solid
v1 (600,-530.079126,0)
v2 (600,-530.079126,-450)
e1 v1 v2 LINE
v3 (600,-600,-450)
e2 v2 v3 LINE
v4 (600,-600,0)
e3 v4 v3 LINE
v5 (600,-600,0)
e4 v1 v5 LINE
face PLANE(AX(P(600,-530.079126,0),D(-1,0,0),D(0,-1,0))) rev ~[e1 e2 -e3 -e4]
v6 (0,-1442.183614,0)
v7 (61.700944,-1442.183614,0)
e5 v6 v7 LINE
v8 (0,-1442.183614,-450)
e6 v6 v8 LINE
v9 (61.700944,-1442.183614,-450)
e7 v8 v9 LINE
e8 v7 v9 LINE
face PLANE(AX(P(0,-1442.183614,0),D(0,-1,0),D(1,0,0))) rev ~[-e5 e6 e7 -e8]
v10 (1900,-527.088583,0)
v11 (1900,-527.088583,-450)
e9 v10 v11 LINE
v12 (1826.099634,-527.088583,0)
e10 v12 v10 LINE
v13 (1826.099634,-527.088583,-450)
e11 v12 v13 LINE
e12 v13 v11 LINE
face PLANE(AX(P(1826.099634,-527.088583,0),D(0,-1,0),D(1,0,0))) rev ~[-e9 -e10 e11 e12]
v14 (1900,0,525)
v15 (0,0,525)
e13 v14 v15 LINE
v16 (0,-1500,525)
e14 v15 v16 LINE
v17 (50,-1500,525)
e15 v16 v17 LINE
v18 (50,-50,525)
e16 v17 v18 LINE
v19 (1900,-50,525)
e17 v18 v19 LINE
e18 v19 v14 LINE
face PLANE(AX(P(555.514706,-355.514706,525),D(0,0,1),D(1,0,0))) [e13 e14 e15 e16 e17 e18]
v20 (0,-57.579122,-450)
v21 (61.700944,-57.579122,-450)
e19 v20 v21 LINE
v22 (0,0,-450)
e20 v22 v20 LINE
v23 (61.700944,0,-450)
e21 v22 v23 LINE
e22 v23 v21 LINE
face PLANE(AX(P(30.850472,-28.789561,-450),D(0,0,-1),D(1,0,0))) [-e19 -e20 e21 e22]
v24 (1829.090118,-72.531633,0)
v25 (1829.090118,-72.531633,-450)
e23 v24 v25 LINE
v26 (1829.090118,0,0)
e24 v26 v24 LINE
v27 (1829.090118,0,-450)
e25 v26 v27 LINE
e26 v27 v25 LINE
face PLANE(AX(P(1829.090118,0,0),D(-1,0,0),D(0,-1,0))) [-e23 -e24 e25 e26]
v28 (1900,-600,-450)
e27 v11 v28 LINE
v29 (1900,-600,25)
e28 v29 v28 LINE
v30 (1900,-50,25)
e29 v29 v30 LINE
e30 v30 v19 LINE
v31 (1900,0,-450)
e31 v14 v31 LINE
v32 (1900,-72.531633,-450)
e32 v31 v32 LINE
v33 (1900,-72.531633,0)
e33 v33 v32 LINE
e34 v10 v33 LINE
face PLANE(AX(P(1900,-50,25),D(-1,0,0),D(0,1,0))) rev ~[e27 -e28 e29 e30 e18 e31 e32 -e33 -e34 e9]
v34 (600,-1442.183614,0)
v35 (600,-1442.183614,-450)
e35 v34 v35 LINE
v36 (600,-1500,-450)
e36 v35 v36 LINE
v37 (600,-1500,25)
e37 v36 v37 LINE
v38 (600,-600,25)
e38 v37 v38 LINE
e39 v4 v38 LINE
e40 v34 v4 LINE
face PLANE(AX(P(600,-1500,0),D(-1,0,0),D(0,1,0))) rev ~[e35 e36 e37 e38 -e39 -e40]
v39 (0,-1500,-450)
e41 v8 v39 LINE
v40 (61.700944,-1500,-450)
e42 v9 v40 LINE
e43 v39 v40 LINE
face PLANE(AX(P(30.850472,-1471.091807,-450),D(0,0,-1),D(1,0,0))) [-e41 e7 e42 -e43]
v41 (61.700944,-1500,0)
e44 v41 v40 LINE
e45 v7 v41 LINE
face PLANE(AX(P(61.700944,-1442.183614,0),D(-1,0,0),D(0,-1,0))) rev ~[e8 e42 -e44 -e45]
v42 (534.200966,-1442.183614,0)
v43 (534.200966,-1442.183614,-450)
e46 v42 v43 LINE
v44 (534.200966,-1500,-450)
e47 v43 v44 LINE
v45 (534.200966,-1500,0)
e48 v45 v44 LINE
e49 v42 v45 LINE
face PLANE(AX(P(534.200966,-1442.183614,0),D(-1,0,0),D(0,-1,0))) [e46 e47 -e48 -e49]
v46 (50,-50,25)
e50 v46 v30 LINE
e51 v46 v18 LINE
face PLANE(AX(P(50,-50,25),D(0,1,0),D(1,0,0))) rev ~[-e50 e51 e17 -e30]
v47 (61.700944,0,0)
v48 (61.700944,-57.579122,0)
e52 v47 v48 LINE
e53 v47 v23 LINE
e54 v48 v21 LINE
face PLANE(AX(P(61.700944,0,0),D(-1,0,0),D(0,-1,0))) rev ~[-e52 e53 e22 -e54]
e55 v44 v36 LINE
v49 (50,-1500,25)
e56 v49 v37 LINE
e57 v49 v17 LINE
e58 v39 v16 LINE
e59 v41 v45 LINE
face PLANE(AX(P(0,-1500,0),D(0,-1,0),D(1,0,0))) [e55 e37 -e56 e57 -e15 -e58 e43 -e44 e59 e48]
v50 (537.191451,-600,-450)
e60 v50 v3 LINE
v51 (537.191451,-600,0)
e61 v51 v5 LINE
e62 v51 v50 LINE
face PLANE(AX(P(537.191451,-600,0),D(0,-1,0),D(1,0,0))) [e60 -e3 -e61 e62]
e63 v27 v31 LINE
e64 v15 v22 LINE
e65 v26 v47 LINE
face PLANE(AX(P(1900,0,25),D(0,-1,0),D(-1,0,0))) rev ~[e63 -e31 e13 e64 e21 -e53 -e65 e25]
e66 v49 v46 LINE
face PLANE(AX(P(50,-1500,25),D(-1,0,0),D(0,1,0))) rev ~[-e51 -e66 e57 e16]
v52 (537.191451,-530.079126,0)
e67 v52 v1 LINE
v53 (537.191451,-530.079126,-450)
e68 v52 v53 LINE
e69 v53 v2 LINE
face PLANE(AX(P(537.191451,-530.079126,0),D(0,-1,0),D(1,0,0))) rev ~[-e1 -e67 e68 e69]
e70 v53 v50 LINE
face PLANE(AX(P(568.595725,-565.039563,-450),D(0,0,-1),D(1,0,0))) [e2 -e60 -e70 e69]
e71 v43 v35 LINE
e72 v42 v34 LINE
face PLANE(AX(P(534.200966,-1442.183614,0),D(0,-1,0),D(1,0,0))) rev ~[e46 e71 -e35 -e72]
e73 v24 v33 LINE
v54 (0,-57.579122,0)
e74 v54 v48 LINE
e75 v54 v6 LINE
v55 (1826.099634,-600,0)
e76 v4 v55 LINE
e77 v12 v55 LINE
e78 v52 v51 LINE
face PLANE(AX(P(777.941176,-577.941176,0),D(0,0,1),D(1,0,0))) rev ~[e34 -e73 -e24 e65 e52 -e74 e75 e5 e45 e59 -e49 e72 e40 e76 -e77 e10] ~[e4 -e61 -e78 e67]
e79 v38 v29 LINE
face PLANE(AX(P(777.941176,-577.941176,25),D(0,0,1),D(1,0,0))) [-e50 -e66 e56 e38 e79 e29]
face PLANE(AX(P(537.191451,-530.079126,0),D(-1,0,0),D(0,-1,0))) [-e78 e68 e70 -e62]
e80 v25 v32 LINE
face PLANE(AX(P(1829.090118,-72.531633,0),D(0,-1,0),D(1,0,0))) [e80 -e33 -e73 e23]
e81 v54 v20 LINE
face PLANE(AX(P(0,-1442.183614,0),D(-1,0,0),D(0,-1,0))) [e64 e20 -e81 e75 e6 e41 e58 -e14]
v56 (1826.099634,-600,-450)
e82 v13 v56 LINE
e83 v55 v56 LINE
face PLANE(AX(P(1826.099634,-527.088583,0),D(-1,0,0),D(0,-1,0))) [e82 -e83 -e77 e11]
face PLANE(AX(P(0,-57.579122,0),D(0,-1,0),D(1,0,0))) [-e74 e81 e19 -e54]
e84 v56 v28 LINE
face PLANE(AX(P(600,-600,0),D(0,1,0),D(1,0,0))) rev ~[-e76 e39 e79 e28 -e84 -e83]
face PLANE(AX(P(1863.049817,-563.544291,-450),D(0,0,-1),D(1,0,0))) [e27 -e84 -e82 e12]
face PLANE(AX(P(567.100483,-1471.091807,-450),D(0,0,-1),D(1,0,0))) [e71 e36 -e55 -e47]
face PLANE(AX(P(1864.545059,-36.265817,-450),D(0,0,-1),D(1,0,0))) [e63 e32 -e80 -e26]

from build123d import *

# Parameters (mm, degrees)
F1_DEPTH = 25
F3_DEPTH = 500
F4_W     = 61.7009438574
F4_H     = 57.8163862228
F4_W_2   = 65.7990336418
F4_W_3   = 62.8085494041
F4_H_2   = 69.920873642
F4_H_3   = 57.5791224837
F4_W_4   = 73.9003658295
F4_H_4   = 72.9114174843
F4_W_5   = 70.9098815918
F4_H_5   = 72.5316330791
F5_DEPTH = 450


with BuildPart() as f1:
    # F0 (on Top) → F1 (new body)
    with BuildSketch(Plane.XY):
        Polygon((1900, 0), (0, 0), (0, -600), (0, -1500), (600, -1500), (600, -600), (1900, -600), align=None)
    extrude(amount=F1_DEPTH)

    # F2 (on face) → F3 (join)
    with BuildSketch(Plane.XY.offset(25)):
        Polygon((1900, -50), (1900, 0), (0, 0), (0, -50), (0, -231.5181791782), (0, -1500), (50, -1500), (50, -50), align=None)
    extrude(amount=F3_DEPTH)

    # F4 (on face) → F5 (join)
    with BuildSketch(Plane(origin=(0, 0, 0), x_dir=(1, 0, 0), z_dir=(0, 0, -1))):
        with Locations((30.8504719287, 1471.0918068886)):
            Rectangle(F4_W, F4_H)
        with Locations((567.1004831791, 1471.0918068886)):
            Rectangle(F4_W_2, F4_H)
        with Locations((568.5957252979, 565.039563179)):
            Rectangle(F4_W_3, F4_H_2)
        with Locations((30.8504719287, 28.7895612419)):
            Rectangle(F4_W, F4_H_3)
        with Locations((1863.0498170853, 563.5442912579)):
            Rectangle(F4_W_4, F4_H_4)
        with Locations((1864.5450592041, 36.2658165395)):
            Rectangle(F4_W_5, F4_H_5)
    extrude(amount=F5_DEPTH)


solid = f1.part
